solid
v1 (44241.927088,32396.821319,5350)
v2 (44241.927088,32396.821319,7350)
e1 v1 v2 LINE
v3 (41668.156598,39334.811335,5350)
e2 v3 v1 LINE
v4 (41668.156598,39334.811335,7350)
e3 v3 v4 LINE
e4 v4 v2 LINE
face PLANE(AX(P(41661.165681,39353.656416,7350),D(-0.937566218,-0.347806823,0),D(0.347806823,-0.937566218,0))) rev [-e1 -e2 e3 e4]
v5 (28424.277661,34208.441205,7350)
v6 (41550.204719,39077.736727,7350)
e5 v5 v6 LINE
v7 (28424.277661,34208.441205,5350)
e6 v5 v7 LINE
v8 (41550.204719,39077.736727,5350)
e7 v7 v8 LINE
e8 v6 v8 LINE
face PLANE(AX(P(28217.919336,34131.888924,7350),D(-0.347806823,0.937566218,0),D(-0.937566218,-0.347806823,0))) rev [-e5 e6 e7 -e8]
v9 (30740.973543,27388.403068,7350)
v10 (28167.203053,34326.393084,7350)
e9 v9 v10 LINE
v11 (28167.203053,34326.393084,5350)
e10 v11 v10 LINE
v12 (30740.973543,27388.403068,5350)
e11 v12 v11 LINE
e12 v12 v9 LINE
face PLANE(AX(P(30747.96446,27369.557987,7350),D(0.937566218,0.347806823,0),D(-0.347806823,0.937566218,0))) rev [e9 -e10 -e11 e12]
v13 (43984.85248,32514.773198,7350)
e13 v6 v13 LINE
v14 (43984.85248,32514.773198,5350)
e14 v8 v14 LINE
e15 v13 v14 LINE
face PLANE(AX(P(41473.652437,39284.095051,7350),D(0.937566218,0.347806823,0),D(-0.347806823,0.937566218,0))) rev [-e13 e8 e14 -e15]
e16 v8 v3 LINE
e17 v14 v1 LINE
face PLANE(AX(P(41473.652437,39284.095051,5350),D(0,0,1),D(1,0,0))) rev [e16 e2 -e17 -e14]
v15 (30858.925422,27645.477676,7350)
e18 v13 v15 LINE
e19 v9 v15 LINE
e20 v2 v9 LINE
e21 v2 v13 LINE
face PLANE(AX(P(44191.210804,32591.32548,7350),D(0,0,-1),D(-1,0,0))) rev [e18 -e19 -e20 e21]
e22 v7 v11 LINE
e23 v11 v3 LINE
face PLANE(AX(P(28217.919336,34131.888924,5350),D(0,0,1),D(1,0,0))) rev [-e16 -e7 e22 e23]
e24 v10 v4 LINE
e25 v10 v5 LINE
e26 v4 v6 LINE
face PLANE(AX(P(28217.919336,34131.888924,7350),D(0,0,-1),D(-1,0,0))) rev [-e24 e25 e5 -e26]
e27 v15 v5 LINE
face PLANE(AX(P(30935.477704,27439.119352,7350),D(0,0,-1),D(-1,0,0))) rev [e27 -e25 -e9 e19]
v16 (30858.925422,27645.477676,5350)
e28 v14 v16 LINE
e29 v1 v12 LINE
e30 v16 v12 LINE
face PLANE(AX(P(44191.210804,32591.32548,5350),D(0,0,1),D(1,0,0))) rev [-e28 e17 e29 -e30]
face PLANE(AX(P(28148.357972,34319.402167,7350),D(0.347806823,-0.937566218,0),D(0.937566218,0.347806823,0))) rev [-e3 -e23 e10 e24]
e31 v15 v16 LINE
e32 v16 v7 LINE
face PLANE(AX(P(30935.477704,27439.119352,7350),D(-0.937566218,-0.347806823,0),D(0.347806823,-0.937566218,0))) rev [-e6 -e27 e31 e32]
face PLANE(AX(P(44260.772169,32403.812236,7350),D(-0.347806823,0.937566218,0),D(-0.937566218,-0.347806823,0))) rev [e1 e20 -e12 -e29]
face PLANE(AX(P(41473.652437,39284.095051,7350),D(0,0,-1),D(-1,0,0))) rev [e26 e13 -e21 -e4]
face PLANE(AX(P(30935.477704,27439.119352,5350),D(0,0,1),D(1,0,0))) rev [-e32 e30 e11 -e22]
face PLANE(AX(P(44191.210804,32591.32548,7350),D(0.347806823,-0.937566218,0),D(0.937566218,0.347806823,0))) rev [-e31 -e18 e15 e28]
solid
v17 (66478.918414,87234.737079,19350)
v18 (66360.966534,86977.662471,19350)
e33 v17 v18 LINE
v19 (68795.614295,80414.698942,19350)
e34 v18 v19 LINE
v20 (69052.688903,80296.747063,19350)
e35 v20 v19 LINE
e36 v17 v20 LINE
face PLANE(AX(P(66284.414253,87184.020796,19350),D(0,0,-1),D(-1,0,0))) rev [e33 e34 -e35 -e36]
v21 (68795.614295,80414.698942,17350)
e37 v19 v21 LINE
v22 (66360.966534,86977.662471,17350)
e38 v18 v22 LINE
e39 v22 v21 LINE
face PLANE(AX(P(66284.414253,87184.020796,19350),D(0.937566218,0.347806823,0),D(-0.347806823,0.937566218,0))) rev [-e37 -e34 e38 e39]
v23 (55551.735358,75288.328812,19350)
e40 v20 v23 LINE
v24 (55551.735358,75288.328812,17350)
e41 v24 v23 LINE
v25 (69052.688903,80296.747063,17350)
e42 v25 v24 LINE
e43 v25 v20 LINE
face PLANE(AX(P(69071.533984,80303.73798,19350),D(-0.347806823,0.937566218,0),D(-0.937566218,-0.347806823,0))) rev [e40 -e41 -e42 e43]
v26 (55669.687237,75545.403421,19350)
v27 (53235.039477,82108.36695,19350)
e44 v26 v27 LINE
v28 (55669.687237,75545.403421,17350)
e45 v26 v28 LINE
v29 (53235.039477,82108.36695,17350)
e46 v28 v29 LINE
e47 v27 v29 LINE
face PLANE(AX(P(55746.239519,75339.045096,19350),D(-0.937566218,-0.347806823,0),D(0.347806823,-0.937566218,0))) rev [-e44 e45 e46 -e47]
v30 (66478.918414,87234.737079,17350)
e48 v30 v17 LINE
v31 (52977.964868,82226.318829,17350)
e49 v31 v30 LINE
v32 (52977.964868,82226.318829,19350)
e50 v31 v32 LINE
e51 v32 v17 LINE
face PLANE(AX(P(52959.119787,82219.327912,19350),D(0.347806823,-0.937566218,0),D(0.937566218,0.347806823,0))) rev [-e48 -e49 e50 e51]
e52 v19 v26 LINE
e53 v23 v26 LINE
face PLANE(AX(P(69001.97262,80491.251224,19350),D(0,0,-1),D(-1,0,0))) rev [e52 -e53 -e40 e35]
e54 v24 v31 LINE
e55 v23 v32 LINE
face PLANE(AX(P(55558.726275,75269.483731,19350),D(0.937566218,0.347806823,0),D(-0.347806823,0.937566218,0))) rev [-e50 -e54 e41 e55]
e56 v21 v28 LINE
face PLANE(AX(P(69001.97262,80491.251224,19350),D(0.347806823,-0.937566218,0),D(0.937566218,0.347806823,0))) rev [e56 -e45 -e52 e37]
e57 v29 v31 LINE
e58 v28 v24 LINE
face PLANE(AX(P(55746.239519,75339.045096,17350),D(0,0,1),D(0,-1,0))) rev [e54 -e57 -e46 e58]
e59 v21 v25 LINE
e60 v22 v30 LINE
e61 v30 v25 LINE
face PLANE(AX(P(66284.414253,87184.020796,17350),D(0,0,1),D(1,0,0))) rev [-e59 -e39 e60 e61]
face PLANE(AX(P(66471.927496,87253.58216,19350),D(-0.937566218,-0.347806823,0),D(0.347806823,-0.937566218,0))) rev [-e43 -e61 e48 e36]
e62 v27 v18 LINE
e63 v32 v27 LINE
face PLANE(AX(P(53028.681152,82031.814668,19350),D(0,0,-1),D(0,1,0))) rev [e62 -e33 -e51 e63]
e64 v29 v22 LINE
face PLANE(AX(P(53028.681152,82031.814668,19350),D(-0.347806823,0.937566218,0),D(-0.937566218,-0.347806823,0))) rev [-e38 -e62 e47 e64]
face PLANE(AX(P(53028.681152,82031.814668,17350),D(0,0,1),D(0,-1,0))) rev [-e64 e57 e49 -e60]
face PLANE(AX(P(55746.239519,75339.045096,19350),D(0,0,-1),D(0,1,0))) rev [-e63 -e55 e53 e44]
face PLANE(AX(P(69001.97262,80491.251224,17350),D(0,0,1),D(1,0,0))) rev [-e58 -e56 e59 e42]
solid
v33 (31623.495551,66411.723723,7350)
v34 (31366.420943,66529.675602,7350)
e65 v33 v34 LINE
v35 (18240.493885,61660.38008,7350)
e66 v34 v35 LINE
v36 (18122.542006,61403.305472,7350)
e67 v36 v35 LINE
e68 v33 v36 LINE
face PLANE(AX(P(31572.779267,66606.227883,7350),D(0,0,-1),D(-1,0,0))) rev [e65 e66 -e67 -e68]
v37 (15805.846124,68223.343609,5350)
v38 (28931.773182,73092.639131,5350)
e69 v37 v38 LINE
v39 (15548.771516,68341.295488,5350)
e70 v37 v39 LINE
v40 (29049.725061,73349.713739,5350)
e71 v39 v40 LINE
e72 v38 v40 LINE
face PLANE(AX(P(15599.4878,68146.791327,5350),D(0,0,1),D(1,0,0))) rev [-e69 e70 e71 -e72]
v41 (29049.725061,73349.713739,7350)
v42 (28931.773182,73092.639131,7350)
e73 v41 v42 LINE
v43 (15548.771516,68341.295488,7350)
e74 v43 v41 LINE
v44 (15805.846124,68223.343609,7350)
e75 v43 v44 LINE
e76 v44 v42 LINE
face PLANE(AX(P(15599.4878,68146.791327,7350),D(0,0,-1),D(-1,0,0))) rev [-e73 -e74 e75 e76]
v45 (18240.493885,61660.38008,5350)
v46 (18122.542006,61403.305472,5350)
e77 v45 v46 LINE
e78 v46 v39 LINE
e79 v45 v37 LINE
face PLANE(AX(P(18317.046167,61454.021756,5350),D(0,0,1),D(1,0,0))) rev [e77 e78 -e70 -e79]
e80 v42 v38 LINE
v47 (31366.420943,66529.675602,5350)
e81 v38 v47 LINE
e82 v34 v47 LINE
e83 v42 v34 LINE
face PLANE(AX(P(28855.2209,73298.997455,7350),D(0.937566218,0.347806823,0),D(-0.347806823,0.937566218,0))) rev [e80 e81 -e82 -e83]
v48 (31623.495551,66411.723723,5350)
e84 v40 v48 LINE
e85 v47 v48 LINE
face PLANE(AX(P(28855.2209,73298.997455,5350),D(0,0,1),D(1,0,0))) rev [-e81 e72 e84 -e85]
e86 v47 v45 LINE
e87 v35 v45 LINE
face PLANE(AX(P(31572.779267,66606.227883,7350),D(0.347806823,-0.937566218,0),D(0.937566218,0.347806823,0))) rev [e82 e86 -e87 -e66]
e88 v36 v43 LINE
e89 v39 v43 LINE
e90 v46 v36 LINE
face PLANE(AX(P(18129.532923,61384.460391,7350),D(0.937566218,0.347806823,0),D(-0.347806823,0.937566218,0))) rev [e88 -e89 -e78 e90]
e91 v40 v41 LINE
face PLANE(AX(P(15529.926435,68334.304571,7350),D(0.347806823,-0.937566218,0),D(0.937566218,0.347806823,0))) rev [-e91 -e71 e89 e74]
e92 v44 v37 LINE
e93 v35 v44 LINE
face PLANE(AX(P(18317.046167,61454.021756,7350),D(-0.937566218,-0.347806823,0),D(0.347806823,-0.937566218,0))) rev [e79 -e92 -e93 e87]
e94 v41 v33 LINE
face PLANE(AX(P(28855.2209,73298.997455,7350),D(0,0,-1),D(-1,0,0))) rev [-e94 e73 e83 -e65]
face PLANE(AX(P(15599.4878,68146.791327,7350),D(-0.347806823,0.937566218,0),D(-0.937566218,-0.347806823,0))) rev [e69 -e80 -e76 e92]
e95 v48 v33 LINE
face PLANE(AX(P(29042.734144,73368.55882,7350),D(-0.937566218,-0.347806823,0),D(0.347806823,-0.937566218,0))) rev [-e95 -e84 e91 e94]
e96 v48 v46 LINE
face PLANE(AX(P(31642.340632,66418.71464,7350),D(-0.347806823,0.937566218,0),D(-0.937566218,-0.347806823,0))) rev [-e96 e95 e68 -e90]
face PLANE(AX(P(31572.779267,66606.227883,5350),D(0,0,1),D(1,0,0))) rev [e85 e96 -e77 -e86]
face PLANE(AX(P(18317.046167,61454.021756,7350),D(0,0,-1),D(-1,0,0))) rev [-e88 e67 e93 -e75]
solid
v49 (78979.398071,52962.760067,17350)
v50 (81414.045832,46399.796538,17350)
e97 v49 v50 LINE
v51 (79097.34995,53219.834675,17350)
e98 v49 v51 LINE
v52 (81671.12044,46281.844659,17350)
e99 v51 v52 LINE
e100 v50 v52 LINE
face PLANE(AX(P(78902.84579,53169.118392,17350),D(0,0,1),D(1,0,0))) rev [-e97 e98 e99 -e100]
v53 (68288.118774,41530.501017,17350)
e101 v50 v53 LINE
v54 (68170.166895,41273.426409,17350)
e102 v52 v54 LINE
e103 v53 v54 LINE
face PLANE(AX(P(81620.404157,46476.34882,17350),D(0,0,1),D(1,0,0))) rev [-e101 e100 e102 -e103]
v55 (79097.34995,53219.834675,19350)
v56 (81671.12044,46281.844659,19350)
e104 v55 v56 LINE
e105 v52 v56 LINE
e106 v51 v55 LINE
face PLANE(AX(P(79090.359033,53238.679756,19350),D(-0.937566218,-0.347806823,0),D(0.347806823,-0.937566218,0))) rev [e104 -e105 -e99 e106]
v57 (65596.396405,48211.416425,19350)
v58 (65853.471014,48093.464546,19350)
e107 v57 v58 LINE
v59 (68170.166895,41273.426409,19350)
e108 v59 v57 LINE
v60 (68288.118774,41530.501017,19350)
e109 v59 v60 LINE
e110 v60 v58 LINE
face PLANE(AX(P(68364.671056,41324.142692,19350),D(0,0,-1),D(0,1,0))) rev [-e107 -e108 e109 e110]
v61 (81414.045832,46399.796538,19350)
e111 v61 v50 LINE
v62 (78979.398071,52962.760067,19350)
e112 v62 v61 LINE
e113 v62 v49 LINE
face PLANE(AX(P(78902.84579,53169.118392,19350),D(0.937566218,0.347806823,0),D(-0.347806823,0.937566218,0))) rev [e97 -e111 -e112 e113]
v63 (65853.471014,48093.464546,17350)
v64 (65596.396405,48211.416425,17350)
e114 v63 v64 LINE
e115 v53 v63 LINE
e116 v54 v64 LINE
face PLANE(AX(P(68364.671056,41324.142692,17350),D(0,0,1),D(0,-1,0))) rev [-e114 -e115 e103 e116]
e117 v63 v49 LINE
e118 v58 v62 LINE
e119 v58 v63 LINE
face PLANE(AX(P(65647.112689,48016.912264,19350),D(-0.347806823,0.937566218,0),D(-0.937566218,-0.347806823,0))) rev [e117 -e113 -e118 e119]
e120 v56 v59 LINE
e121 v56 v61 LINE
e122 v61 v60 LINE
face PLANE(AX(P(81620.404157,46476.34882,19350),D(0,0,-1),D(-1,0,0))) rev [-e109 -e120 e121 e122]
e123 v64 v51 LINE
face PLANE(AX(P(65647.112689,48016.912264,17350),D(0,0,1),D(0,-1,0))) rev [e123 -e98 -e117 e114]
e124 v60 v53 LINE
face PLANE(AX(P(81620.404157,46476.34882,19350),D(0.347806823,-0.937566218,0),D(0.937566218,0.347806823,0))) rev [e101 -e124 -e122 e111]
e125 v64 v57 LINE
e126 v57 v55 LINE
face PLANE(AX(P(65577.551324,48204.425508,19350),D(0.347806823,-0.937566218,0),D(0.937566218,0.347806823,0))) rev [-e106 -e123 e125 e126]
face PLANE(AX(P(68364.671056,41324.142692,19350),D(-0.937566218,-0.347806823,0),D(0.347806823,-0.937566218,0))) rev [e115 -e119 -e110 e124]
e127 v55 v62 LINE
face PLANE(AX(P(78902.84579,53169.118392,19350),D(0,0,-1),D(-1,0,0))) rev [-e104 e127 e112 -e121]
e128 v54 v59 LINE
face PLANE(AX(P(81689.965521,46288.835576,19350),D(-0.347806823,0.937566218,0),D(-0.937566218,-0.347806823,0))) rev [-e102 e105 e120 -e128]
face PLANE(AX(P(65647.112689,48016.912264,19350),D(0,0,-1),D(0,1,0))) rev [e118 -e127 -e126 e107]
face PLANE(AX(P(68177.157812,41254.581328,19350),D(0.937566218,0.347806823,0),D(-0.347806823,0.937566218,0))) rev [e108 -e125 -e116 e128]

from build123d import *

# Parameters (mm, degrees)
SKETCH1_W       = 200
SKETCH1_H       = 2000
SWEEP6_START    = 17350
SWEEP6_DEPTH    = 2000
LPATTERN1_COUNT = 2
LPATTERN1_PITCH = 36280


# Read off the part's stored shape, not the designer's step: Sweep6
with BuildPart() as part:
    # Sweep1: sweep along a curve in space
    with BuildLine() as sweep1_path:
        Line((43984.852479613, 32514.773197836, 6350), (41550.204718904, 39077.736726706, 6350))
        Line((41550.204718904, 39077.736726706, 6350), (28424.277661165, 34208.441205286, 6350))
        Line((28424.277661165, 34208.441205286, 6350), (30858.925421874, 27645.477676417, 6350))
        Line((43984.852479613, 32514.773197836, 6350), (30858.925421874, 27645.477676417, 6350))
    # Sketch1 → Sweep1 (sweep)
    with BuildSketch(Plane(origin=(-5281.975673085, 14238.369205706, 0), x_dir=(0.93756621840993, 0.34780682295852583, 0), z_dir=(0.34780682295852583, -0.93756621840993, 0))):
        with Locations((38447.571771786, 6350)):
            Rectangle(SKETCH1_W, SKETCH1_H)
    sweep(path=sweep1_path.line, transition=Transition.RIGHT)


with BuildPart() as body_2:
    # Sweep6 outline → Sweep6 (new body)
    with BuildSketch(Plane.XY.offset(SWEEP6_START)):
        Polygon((81671.120440358, 46281.844659179), (79097.349950465, 53219.834675412), (65596.396405362, 48211.41642481), (68170.166895255, 41273.426408576), align=None)
        Polygon((78979.398071375, 52962.760067139), (81414.045832085, 46399.796538269), (68288.118774346, 41530.50101685), (65853.471013636, 48093.464545719), align=None, mode=Mode.SUBTRACT)
    extrude(amount=SWEEP6_DEPTH)


with BuildPart() as lpattern1_1:
    # LPattern1: pattern copy
    add(body_2.part.moved(Location(Vector(-0.34780682295852905, 0.9375662184099289, 0) * (1 * LPATTERN1_PITCH))))


with BuildPart() as lpattern1_2:
    # LPattern1: pattern copy
    add(part.part.moved(Location(Vector(-0.34780682295852905, 0.9375662184099289, 0) * (1 * LPATTERN1_PITCH))))


solid = Compound([part.part, body_2.part, lpattern1_1.part, lpattern1_2.part])
